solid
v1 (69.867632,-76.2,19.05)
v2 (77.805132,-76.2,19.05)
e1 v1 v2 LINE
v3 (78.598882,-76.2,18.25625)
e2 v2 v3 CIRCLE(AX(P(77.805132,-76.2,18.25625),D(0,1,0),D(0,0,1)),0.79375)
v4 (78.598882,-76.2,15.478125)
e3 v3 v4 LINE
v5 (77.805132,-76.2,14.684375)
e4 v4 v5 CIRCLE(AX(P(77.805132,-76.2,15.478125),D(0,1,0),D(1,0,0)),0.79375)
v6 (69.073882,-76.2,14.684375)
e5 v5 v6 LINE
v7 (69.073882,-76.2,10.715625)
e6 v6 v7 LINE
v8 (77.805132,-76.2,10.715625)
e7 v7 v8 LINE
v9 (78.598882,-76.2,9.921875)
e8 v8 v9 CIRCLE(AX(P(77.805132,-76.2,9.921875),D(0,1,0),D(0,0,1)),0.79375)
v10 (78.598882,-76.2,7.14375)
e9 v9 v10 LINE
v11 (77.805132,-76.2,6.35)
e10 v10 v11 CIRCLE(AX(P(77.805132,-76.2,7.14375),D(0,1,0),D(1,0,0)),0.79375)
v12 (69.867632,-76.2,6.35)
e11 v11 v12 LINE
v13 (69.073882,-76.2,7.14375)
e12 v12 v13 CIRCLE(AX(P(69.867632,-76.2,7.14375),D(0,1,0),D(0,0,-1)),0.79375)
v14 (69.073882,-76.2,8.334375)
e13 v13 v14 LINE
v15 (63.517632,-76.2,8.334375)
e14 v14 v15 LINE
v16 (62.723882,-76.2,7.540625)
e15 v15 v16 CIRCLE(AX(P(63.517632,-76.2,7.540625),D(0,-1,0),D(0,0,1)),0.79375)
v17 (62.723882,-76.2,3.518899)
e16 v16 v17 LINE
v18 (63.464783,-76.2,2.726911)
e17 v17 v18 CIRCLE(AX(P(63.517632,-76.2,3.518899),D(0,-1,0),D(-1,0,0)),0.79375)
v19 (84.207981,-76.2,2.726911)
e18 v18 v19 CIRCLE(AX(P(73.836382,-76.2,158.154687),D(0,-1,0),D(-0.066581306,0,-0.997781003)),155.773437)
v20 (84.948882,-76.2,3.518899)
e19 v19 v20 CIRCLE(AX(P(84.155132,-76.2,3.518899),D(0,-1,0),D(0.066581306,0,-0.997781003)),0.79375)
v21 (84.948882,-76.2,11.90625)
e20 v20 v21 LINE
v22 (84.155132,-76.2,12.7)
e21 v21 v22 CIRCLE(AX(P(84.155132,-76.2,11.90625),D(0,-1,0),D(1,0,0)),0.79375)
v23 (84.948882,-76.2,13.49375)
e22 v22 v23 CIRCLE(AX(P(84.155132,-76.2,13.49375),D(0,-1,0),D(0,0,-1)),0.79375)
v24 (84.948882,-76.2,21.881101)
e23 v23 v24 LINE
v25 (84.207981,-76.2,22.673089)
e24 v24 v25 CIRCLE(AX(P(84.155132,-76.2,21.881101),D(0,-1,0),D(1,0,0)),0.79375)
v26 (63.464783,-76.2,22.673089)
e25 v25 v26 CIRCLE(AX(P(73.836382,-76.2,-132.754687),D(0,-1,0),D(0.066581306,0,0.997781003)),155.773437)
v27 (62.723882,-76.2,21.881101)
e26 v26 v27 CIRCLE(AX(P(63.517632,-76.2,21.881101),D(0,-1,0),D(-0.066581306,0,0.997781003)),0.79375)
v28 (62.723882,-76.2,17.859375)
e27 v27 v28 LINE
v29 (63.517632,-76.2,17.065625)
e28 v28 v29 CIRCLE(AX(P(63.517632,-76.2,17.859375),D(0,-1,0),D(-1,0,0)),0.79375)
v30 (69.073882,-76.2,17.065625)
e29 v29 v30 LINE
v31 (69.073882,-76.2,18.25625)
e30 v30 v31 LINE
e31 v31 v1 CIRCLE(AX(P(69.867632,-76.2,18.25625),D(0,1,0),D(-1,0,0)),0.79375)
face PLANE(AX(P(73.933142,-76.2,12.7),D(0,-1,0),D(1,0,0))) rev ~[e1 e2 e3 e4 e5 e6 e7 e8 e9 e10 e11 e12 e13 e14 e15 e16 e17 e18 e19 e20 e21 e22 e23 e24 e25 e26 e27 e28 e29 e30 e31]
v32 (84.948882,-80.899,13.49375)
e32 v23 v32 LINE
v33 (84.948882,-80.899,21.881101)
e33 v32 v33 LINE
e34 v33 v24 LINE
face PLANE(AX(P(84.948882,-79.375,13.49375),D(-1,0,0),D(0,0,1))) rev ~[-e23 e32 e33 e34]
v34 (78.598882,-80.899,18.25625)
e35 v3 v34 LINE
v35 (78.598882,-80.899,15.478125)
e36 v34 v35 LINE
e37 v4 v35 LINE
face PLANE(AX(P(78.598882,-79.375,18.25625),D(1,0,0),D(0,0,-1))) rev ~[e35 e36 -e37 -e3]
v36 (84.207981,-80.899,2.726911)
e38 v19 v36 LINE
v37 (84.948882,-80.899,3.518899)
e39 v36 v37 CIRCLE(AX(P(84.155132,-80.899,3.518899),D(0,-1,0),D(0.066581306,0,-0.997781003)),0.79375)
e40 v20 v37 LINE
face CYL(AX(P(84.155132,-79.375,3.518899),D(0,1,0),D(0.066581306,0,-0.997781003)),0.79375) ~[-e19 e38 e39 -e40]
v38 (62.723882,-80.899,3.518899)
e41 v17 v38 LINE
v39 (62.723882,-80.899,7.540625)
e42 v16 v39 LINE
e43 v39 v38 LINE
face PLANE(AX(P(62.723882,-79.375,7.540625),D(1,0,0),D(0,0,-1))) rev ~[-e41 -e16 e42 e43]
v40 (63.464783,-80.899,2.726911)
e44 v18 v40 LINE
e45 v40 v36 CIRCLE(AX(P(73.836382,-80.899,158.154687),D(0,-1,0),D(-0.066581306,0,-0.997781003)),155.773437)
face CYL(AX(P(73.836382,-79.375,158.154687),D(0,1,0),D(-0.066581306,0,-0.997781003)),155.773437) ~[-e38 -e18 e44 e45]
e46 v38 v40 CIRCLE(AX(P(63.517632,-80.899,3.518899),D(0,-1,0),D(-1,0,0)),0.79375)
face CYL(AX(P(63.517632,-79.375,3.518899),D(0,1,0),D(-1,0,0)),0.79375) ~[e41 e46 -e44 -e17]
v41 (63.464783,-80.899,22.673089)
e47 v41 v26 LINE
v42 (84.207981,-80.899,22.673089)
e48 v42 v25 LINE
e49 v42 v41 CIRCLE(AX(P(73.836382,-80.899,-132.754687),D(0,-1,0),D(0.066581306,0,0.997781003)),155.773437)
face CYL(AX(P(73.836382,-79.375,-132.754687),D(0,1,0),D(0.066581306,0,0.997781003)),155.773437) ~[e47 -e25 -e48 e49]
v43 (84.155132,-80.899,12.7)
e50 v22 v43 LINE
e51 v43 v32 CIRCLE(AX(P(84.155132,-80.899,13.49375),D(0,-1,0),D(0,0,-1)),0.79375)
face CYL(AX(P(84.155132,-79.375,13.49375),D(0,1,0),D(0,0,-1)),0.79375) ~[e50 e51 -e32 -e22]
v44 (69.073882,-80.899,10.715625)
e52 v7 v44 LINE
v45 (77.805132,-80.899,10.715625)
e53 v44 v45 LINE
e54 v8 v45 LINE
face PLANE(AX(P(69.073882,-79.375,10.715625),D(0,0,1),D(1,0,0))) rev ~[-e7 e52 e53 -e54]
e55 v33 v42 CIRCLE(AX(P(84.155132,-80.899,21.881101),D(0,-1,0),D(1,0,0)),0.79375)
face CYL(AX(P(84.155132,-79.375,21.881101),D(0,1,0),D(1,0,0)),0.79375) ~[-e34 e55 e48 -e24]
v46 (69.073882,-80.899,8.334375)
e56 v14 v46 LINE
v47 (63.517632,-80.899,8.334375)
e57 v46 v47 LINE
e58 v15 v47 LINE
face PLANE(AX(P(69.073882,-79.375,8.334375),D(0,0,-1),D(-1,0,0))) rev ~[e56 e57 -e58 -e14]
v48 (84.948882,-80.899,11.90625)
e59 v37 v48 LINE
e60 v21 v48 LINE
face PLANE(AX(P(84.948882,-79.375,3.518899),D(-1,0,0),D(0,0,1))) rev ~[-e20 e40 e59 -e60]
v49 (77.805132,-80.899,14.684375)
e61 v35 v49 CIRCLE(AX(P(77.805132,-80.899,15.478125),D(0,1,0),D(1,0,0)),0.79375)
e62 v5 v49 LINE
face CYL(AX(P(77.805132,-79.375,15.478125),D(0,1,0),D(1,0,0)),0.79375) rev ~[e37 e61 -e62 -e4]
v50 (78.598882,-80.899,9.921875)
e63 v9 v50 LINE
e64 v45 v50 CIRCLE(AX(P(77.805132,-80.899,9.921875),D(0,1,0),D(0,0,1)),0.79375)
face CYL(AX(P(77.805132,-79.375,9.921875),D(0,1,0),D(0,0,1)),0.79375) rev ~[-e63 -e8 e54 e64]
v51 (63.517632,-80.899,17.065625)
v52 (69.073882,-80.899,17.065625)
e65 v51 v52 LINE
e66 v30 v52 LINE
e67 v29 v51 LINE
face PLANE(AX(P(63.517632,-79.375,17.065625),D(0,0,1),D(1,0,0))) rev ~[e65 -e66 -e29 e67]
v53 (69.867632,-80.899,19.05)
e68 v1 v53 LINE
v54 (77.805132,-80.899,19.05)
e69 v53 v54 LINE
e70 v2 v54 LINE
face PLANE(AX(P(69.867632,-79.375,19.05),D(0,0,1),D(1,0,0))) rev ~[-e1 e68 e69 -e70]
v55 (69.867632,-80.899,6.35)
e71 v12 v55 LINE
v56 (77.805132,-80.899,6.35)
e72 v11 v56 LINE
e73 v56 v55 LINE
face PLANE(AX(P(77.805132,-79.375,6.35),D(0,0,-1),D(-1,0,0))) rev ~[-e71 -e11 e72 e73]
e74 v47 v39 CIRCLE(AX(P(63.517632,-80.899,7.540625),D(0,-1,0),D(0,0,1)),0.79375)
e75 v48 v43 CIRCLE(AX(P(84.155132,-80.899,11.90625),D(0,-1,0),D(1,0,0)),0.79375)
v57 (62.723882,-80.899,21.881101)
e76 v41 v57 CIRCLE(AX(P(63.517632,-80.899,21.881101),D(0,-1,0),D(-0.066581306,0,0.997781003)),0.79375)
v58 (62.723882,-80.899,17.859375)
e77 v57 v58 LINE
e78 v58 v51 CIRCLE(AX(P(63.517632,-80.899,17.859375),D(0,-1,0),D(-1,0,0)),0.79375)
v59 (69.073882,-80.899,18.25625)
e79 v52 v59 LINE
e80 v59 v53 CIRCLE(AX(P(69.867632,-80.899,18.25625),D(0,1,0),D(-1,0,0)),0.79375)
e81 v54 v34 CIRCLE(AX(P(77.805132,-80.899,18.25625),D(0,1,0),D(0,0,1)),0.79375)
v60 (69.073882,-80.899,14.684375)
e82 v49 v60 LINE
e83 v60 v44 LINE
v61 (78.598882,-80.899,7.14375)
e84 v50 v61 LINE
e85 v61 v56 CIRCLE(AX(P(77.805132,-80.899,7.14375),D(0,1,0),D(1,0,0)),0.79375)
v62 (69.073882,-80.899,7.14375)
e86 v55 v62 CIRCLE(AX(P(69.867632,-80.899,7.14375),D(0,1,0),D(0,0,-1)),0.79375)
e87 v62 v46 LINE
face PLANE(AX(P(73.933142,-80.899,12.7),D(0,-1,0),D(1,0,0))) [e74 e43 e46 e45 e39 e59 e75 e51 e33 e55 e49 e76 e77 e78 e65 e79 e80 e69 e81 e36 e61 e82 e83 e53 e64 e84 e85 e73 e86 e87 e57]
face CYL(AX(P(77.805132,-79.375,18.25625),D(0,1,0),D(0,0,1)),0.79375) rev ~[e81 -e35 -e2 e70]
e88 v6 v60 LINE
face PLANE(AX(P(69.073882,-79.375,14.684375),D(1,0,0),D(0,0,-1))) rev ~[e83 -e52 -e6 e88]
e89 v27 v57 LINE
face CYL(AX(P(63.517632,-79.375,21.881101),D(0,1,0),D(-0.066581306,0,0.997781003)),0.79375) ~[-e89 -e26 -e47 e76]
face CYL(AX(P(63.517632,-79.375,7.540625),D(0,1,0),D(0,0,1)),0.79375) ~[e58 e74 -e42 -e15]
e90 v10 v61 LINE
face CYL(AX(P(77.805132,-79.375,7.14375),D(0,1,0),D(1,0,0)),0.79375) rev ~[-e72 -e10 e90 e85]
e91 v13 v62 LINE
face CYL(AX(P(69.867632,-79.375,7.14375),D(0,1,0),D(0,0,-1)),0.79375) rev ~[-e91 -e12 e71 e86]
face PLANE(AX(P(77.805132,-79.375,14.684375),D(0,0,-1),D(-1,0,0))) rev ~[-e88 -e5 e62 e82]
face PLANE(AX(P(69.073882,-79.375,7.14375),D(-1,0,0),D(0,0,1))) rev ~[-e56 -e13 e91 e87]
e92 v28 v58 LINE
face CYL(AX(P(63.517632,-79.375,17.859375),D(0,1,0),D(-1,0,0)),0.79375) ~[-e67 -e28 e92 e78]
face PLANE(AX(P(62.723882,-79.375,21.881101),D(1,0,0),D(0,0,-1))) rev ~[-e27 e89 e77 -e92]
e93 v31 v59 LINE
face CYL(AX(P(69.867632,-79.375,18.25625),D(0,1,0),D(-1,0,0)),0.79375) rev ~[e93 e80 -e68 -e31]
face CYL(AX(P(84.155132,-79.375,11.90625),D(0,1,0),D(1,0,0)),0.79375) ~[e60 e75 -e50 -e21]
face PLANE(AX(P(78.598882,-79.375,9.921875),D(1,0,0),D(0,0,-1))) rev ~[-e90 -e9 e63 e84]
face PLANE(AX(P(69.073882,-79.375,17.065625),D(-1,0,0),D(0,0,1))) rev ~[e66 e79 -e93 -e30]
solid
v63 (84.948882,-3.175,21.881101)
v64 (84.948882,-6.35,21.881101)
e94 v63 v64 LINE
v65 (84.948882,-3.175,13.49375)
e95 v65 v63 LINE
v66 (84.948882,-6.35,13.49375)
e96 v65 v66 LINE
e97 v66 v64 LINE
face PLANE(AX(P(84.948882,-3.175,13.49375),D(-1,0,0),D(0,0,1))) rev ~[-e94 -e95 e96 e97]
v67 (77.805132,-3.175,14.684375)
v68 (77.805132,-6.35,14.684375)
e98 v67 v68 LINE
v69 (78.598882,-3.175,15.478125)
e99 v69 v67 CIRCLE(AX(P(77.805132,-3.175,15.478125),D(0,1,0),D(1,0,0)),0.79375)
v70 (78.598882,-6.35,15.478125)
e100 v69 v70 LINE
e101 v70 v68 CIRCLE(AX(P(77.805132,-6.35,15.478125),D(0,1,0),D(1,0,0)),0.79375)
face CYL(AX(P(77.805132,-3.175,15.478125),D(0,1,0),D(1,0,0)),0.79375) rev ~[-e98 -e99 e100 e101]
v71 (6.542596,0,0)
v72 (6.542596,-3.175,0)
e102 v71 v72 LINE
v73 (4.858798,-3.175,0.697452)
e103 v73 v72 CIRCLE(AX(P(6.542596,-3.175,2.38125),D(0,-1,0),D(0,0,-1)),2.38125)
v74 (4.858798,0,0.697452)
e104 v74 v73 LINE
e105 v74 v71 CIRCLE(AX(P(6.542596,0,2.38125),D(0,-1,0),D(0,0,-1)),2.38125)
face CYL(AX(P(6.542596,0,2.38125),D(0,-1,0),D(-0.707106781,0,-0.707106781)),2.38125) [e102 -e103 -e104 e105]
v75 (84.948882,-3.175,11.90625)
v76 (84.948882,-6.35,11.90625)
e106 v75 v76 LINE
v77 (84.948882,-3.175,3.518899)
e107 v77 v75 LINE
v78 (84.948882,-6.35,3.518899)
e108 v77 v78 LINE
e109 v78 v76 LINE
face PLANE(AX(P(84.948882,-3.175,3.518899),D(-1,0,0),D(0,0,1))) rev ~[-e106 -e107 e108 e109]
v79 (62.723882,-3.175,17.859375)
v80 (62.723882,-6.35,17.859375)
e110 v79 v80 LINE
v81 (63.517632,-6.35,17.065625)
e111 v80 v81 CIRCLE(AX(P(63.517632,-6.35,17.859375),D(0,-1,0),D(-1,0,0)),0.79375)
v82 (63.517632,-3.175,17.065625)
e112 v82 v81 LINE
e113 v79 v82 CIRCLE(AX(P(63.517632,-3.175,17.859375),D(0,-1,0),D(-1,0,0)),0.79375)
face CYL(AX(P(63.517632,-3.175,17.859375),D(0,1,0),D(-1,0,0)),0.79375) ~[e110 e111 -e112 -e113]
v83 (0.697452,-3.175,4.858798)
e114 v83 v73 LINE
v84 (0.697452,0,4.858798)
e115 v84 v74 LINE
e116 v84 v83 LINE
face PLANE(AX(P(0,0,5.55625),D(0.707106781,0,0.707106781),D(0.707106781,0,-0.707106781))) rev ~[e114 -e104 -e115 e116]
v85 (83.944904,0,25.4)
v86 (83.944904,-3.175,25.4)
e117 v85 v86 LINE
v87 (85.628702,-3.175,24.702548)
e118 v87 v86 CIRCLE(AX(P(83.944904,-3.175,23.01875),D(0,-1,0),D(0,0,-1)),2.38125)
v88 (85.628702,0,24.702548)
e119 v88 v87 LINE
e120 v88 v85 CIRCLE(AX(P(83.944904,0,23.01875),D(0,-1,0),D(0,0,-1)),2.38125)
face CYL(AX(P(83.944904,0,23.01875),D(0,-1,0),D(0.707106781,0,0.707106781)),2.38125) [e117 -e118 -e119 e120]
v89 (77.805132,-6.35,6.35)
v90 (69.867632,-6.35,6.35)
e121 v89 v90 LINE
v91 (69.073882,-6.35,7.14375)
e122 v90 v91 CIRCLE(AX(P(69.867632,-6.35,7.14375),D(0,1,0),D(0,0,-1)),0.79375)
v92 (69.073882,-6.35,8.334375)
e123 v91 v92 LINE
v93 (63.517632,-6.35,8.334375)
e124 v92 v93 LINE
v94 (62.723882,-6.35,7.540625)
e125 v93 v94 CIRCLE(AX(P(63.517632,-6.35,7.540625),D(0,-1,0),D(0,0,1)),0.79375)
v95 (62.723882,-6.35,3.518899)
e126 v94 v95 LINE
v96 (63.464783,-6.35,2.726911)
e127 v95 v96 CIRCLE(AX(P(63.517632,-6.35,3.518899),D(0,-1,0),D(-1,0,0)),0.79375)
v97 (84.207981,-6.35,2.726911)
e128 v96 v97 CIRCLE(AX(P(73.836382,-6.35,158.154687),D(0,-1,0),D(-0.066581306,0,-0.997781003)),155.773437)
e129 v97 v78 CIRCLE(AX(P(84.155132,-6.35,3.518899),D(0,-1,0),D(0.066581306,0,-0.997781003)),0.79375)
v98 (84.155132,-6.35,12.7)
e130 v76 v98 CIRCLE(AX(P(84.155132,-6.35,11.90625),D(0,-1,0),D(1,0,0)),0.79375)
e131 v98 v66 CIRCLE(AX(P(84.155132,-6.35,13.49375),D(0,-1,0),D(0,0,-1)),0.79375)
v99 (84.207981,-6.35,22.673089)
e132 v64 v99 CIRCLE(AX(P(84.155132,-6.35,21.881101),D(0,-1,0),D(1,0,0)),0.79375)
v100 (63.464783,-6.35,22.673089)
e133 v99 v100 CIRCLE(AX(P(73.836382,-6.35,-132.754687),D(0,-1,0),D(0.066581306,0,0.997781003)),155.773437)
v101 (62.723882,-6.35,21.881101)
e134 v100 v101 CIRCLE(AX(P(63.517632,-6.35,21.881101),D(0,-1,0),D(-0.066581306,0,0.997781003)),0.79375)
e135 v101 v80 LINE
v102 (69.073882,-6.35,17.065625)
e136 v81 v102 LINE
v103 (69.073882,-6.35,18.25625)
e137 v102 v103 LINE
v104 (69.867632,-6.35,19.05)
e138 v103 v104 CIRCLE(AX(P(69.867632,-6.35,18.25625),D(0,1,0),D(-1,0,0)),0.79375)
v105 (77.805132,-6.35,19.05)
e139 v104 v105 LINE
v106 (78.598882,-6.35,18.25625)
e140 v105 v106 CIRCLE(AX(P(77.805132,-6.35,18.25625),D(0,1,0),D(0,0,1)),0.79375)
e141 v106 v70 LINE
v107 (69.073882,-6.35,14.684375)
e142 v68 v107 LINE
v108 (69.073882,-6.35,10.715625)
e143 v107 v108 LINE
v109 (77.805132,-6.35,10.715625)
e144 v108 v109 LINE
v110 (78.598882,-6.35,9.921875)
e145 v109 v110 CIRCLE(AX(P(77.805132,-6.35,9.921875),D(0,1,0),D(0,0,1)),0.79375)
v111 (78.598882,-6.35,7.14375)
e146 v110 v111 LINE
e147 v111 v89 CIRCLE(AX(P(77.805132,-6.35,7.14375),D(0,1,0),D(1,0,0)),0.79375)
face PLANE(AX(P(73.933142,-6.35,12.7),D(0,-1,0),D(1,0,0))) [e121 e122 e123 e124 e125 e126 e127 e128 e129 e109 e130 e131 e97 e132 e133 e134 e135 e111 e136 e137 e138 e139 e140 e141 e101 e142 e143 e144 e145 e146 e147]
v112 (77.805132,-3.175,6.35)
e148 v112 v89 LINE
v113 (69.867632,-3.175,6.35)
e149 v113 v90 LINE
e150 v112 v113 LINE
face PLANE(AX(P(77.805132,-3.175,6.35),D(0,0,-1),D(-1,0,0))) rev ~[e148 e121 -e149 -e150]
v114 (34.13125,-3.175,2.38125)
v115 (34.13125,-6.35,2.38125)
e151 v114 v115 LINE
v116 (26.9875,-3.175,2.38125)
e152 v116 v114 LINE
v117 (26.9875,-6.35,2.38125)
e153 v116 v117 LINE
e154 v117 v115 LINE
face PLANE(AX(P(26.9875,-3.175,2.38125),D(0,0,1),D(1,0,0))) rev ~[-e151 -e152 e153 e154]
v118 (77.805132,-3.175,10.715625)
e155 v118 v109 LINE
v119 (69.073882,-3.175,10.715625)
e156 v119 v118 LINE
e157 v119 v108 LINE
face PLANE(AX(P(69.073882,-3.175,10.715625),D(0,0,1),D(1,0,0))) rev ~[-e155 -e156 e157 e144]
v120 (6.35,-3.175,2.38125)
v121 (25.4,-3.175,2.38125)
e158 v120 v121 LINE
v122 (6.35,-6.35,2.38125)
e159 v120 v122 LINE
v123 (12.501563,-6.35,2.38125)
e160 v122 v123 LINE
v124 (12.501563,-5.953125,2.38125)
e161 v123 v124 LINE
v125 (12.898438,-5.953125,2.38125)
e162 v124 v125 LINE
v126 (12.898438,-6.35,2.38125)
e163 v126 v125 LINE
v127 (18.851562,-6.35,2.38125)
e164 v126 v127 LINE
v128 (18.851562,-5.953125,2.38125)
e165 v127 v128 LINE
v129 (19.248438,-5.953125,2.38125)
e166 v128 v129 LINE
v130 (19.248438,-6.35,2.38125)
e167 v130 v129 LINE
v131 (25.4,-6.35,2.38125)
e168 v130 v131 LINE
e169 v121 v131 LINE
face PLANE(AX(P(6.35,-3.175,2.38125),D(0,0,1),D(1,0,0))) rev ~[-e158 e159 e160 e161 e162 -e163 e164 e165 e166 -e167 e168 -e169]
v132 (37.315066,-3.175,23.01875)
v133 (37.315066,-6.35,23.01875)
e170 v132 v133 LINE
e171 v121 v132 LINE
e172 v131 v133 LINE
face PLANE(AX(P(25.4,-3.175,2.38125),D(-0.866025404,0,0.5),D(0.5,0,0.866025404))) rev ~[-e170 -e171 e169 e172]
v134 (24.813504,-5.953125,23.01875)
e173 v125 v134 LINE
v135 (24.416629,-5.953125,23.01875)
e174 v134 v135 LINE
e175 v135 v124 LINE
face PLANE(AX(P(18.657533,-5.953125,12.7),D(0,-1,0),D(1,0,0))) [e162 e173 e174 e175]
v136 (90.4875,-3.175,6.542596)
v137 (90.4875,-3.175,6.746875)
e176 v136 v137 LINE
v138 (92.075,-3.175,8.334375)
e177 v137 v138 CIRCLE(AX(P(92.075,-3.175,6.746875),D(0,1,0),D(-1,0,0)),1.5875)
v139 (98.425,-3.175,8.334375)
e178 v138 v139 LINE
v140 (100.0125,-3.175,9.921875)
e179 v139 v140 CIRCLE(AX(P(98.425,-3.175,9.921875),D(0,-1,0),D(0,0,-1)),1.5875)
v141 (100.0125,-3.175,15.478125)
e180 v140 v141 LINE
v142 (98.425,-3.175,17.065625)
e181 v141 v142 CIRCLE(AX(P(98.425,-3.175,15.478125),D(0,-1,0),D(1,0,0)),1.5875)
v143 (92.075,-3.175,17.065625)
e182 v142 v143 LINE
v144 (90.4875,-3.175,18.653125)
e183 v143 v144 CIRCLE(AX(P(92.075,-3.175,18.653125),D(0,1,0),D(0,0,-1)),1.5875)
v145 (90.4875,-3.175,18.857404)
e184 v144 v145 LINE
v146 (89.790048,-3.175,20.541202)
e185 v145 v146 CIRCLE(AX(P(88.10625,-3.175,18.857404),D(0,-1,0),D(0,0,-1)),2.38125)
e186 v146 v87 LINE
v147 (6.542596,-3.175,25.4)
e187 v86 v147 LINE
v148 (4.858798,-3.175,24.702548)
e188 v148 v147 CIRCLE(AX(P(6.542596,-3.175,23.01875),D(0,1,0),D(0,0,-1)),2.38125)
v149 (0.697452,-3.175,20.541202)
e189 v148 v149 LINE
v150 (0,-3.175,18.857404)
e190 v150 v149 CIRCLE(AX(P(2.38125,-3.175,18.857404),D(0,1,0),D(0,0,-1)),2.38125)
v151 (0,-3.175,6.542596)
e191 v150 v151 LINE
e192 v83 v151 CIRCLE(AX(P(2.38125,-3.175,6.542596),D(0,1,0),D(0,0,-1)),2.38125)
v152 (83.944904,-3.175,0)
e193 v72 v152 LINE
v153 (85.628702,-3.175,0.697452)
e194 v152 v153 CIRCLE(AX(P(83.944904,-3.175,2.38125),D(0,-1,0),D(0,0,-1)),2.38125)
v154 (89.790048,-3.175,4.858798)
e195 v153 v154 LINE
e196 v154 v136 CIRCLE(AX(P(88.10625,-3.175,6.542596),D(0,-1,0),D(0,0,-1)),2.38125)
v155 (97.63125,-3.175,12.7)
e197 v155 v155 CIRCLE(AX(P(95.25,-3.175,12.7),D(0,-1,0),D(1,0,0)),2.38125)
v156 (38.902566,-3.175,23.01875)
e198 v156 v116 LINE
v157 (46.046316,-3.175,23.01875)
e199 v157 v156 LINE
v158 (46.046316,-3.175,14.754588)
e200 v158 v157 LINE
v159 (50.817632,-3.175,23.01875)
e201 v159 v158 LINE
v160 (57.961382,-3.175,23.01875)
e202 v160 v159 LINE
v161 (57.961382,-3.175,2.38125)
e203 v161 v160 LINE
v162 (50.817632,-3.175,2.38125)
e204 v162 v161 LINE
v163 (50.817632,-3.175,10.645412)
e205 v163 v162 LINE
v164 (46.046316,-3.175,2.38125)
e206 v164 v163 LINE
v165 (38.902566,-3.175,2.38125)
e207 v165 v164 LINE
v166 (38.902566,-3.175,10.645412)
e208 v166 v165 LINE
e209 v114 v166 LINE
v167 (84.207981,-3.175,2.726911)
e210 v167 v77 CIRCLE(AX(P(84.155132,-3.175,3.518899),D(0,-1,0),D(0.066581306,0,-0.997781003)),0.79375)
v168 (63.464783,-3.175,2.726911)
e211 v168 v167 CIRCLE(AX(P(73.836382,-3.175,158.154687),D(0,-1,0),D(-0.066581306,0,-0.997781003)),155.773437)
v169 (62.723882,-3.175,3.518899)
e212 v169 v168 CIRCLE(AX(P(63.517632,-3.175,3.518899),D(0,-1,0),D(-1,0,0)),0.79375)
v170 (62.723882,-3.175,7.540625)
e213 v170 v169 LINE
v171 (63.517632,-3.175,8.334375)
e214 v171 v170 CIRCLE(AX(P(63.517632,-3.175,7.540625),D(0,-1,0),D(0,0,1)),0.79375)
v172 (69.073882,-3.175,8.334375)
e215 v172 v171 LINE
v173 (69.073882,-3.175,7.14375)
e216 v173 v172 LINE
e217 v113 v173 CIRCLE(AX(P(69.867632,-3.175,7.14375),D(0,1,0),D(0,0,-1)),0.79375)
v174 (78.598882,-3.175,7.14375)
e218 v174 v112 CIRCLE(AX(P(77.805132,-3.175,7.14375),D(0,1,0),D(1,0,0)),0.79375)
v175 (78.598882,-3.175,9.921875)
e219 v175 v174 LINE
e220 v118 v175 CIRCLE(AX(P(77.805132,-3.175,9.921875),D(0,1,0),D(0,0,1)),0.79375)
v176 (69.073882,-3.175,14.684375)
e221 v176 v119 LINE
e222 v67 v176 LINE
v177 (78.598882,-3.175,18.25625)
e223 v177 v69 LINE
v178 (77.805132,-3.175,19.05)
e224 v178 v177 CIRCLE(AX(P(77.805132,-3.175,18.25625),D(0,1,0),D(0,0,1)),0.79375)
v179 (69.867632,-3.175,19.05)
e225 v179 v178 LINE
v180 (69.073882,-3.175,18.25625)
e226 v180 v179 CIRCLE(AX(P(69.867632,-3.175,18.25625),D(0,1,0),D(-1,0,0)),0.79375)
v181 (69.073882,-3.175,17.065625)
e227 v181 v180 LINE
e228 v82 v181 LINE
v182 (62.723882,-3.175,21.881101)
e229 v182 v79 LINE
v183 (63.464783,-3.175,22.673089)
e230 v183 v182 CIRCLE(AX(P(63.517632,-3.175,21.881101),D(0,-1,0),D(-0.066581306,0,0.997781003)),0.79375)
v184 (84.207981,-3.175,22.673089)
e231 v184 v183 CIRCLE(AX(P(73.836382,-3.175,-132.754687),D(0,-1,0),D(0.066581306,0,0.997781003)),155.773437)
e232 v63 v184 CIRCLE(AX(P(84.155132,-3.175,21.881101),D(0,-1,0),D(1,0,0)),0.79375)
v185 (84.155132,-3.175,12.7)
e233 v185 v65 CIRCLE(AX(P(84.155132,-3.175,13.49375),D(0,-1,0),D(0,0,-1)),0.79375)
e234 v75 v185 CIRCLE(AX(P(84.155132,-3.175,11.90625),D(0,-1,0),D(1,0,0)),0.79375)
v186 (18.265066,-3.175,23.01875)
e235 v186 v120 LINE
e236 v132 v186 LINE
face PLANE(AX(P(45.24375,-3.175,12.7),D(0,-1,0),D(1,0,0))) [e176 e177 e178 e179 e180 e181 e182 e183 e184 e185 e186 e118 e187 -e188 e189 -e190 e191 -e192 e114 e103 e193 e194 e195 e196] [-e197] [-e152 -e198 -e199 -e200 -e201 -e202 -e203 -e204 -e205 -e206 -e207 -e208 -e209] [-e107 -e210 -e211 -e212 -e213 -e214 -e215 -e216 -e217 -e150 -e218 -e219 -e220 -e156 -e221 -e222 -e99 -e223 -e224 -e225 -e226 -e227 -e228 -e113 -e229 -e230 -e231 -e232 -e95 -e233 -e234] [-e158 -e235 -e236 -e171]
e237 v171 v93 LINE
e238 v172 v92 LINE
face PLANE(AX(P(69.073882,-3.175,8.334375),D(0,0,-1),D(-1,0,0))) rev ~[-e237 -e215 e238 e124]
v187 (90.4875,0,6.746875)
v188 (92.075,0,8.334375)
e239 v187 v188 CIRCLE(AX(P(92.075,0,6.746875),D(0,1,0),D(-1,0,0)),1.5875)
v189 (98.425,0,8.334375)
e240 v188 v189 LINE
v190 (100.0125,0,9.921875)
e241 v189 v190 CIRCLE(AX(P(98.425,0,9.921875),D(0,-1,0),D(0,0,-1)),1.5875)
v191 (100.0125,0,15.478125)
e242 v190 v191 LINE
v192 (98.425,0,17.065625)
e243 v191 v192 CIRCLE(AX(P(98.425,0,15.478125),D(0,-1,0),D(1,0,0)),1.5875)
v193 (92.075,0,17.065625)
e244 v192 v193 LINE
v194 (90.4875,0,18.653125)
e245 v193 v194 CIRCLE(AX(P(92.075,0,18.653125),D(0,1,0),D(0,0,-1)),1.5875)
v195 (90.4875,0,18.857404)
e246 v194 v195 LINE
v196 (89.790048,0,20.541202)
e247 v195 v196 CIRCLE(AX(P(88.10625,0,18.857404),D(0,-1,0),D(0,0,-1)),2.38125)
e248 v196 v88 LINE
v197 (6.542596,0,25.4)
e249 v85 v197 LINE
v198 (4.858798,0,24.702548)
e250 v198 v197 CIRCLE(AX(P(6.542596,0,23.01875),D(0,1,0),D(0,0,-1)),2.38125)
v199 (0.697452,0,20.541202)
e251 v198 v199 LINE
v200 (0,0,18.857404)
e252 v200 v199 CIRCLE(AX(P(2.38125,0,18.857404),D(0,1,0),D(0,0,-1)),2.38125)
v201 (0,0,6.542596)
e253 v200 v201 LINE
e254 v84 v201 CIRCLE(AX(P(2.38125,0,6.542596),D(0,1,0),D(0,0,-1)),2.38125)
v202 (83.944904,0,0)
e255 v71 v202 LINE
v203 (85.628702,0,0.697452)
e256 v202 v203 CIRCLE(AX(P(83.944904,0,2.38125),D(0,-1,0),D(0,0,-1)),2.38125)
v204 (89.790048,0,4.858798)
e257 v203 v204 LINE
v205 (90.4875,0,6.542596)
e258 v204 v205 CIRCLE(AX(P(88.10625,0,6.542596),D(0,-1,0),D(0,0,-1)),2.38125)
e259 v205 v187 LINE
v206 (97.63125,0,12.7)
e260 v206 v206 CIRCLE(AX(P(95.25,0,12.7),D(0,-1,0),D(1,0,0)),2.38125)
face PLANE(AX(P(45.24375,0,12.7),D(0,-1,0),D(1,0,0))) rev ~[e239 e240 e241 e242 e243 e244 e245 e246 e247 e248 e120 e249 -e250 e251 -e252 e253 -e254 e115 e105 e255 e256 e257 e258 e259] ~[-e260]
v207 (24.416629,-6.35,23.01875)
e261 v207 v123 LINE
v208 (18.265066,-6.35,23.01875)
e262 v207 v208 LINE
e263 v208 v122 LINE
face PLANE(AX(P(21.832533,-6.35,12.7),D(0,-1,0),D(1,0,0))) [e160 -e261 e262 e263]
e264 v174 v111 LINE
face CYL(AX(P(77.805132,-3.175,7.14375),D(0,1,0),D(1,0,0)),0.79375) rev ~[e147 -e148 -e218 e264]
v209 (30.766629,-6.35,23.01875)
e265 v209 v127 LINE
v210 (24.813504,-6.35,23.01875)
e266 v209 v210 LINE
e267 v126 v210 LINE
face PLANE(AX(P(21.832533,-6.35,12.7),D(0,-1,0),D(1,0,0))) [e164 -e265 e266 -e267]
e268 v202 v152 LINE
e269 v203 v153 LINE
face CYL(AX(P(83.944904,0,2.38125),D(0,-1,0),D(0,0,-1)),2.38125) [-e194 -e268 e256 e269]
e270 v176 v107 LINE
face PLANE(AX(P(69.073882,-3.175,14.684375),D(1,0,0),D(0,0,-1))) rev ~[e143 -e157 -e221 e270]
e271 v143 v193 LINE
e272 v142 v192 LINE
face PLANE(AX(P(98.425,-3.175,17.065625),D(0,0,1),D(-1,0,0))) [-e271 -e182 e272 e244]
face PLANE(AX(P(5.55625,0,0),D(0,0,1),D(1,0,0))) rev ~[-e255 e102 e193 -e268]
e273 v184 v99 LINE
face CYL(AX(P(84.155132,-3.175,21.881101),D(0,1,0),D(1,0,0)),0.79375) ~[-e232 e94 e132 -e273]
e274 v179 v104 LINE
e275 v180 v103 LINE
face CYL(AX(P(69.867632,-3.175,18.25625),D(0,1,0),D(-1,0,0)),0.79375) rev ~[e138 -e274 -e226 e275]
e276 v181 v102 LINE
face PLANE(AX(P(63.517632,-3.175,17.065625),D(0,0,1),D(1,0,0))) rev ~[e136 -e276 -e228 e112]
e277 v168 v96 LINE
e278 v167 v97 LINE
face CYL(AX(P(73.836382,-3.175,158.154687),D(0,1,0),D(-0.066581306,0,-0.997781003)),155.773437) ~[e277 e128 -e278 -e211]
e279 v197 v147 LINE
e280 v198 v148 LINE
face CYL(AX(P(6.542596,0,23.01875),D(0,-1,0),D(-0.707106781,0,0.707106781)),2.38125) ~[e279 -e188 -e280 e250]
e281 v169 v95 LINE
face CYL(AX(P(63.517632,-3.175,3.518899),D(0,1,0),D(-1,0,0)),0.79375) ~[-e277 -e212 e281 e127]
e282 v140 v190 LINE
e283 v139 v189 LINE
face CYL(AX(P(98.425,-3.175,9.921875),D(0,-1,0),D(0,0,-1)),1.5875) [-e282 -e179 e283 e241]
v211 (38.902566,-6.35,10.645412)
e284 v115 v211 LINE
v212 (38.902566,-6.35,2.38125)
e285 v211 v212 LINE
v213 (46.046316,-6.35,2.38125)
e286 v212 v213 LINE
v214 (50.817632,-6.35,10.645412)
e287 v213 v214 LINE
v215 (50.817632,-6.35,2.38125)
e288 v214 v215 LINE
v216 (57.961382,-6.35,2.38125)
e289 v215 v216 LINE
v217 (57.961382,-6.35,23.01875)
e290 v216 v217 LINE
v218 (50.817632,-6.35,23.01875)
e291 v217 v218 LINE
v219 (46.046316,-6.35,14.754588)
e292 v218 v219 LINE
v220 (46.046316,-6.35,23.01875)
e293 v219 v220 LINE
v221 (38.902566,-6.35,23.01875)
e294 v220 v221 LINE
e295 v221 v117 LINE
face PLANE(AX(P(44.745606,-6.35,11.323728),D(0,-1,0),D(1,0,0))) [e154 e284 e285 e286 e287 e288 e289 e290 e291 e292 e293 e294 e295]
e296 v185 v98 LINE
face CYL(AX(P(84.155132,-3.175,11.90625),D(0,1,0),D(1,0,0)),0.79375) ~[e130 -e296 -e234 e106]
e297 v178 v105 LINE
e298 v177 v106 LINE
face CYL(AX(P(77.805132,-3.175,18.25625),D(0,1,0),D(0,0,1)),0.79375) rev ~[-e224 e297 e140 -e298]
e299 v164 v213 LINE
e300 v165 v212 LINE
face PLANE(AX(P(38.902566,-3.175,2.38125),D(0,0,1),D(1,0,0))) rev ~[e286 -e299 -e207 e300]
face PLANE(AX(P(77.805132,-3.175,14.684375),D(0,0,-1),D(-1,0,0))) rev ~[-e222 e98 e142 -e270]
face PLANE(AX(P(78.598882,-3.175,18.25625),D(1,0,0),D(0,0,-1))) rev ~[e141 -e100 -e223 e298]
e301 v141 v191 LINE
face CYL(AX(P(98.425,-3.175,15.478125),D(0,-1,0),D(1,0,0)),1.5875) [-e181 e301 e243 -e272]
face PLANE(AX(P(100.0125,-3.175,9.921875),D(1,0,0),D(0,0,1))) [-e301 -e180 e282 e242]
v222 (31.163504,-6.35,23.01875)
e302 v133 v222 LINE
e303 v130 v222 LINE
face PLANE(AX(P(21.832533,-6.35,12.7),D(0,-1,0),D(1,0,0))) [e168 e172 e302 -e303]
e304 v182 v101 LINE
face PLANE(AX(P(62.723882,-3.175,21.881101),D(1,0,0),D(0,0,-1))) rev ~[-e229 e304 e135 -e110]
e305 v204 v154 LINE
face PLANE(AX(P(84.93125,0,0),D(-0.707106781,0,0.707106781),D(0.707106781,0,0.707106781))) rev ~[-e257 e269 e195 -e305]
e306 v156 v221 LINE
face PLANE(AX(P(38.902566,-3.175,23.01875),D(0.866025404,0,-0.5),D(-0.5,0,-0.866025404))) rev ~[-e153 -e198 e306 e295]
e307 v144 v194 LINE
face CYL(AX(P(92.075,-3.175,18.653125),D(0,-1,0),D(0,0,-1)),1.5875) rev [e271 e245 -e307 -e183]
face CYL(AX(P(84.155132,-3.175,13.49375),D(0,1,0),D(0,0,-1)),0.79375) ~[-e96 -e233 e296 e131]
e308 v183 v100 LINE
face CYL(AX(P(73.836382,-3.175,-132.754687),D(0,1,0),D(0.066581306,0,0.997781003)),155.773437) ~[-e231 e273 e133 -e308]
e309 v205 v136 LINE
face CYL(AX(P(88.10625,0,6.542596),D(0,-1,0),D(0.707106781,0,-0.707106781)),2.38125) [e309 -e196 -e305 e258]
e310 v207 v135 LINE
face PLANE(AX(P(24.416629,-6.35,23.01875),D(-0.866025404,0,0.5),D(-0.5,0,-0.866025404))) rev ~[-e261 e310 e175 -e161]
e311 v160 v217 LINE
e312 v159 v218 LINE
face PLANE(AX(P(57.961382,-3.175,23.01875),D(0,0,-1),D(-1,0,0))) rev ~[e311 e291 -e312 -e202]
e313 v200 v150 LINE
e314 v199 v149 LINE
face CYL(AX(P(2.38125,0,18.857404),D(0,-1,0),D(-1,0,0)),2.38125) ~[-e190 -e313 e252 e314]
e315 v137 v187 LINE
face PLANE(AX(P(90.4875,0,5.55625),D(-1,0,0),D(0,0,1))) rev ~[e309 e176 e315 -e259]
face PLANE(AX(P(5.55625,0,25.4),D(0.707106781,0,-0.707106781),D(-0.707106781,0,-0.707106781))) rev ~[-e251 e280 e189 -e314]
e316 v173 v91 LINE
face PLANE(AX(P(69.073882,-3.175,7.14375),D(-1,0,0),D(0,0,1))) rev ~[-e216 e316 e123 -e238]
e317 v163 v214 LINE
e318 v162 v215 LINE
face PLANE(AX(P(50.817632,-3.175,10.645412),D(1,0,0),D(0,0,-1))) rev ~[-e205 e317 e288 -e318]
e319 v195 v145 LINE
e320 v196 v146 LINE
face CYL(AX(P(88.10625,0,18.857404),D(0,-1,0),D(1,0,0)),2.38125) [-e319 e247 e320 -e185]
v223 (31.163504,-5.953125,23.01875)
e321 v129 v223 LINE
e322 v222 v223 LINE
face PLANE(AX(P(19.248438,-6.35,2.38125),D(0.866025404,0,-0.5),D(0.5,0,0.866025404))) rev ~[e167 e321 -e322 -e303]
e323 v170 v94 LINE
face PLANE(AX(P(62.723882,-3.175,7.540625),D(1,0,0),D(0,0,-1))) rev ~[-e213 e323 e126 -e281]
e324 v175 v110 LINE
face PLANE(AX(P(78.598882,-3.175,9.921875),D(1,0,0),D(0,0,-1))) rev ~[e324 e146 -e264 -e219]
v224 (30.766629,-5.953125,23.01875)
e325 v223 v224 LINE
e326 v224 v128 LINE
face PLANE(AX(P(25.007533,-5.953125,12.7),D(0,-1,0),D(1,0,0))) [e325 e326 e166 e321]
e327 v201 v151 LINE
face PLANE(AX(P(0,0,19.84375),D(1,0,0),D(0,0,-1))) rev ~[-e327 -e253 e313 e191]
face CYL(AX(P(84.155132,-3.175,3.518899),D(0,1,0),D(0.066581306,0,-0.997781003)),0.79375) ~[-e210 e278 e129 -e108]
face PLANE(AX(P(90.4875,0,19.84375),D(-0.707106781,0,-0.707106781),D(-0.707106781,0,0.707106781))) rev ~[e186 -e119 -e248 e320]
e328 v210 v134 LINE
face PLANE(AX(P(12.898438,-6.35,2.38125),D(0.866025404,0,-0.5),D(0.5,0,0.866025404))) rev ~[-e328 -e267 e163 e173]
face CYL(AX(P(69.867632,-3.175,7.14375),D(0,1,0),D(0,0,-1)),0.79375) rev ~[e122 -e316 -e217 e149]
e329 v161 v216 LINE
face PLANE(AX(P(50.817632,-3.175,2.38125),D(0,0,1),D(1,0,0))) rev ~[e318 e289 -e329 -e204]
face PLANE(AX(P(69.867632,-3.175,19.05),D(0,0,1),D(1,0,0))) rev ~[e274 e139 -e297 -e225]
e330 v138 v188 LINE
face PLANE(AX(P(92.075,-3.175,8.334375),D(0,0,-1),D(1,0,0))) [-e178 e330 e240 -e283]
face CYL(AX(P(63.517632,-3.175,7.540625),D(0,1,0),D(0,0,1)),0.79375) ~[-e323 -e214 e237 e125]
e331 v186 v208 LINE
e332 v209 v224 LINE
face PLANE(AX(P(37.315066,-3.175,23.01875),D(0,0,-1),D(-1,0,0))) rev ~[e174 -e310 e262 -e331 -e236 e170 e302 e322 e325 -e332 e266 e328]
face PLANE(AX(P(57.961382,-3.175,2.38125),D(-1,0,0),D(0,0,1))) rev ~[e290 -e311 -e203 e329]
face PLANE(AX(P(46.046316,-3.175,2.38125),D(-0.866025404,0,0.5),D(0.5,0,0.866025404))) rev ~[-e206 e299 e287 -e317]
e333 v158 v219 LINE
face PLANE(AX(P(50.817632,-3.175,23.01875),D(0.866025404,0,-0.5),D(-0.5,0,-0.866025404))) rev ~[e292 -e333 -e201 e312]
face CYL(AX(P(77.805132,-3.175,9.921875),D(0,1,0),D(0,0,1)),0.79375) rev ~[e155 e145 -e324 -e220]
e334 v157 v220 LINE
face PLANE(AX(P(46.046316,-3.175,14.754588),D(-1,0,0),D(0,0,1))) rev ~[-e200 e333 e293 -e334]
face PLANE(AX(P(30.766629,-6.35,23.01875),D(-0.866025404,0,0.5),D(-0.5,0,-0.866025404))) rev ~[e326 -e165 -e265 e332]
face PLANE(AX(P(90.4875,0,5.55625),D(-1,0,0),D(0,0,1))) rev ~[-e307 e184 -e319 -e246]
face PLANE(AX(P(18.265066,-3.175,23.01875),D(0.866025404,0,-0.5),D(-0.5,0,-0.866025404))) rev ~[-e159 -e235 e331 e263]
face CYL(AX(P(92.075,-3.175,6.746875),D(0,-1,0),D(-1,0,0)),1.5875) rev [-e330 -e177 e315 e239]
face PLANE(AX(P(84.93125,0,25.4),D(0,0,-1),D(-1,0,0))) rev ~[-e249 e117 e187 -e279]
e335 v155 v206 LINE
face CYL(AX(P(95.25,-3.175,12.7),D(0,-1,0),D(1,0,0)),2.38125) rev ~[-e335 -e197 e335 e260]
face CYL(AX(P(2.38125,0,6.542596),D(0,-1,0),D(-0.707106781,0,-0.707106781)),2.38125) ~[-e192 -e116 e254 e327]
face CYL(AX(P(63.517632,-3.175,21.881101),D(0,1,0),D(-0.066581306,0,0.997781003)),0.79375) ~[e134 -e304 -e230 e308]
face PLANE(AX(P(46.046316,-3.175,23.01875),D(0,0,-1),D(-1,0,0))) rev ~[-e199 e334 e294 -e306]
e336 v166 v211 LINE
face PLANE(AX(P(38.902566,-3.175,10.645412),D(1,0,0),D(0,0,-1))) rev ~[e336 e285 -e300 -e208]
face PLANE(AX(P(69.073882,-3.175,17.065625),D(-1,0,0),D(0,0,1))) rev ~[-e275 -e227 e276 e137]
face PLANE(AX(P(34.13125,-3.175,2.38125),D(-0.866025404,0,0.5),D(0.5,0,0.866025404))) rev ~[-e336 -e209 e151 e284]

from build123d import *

# Parameters (mm, degrees)
F1_DEPTH  = 3.175
F3_DEPTH  = 3.175
F5_DEPTH  = 0.396875
F6_R      = 2.38125
F7_R      = 2.38125
F8_DEPTH  = 3.175
F11_DEPTH = 3.175
F12_DEPTH = 1.524


# Not quite as in the source:
# - a feature names something its author has since deleted; it is built from what else it names


with BuildPart() as f1:
    # F0 (on Front) → F1 (new body)
    with BuildSketch(Plane.XZ):
        Polygon((0, 5.55625), (5.55625, 0), (84.93125, 0), (90.4875, 5.55625), (90.4875, 19.84375), (84.93125, 25.4), (5.55625, 25.4), (0, 19.84375), align=None)
    extrude(amount=F1_DEPTH)

    # F2 (on face) → F3 (join)
    with BuildSketch(Plane.XZ.offset(3.175)):
        Polygon((18.2650661804, 23.01875), (6.35, 2.38125), (25.4, 2.38125), (37.3150661804, 23.01875), align=None)
        Polygon((38.9025661804, 23.01875), (26.9875, 2.38125), (34.13125, 2.38125), (38.9025661804, 10.6454120434), (38.9025661804, 2.38125), (46.0463161804, 2.38125), (50.8176323608, 10.6454120434), (50.8176323608, 2.38125), (57.9613823608, 2.38125), (57.9613823608, 23.01875), (50.8176323608, 23.01875), (46.0463161804, 14.7545879566), (46.0463161804, 23.01875), align=None)
        with BuildLine():
            ThreePointArc((63.4647834492, 22.6730891893), (62.9379825156, 22.4233597915), (62.7238823608, 21.8811005183))
            Line((62.7238823608, 21.8811005183), (62.7238823608, 17.859375))
            ThreePointArc((62.7238823608, 17.859375), (62.9563663532, 17.2981089924), (63.5176323608, 17.065625))
            Line((63.5176323608, 17.065625), (69.0738823608, 17.065625))
            Line((69.0738823608, 17.065625), (69.0738823608, 18.25625))
            ThreePointArc((69.0738823608, 18.25625), (69.3063663532, 18.8175160076), (69.8676323608, 19.05))
            Line((69.8676323608, 19.05), (77.8051323608, 19.05))
            ThreePointArc((77.8051323608, 19.05), (78.3663983684, 18.8175160076), (78.5988823608, 18.25625))
            Line((78.5988823608, 18.25625), (78.5988823608, 15.478125))
            ThreePointArc((78.5988823608, 15.478125), (78.3663983684, 14.9168589924), (77.8051323608, 14.684375))
            Line((77.8051323608, 14.684375), (69.0738823608, 14.684375))
            Line((69.0738823608, 14.684375), (69.0738823608, 10.715625))
            Line((69.0738823608, 10.715625), (77.8051323608, 10.715625))
            ThreePointArc((77.8051323608, 10.715625), (78.3663983684, 10.4831410076), (78.5988823608, 9.921875))
            Line((78.5988823608, 9.921875), (78.5988823608, 7.14375))
            ThreePointArc((78.5988823608, 7.14375), (78.3663983684, 6.5824839924), (77.8051323608, 6.35))
            Line((77.8051323608, 6.35), (69.8676323608, 6.35))
            ThreePointArc((69.8676323608, 6.35), (69.3063663532, 6.5824839924), (69.0738823608, 7.14375))
            Line((69.0738823608, 7.14375), (69.0738823608, 8.334375))
            Line((69.0738823608, 8.334375), (63.5176323608, 8.334375))
            ThreePointArc((63.5176323608, 8.334375), (62.9563663532, 8.1018910076), (62.7238823608, 7.540625))
            Line((62.7238823608, 7.540625), (62.7238823608, 3.5188994817))
            ThreePointArc((62.7238823608, 3.5188994817), (62.9379825156, 2.9766402085), (63.4647834492, 2.7269108107))
            ThreePointArc((63.4647834492, 2.7269108107), (73.8363823608, 2.38125), (84.2079812725, 2.7269108107))
            ThreePointArc((84.2079812725, 2.7269108107), (84.734782206, 2.9766402085), (84.9488823608, 3.5188994817))
            Line((84.9488823608, 3.5188994817), (84.9488823608, 11.90625))
            ThreePointArc((84.9488823608, 11.90625), (84.7163983684, 12.4675160076), (84.1551323608, 12.7))
            ThreePointArc((84.1551323608, 12.7), (84.7163983684, 12.9324839924), (84.9488823608, 13.49375))
            Line((84.9488823608, 13.49375), (84.9488823608, 16.8671875))
            Line((84.9488823608, 16.8671875), (84.9488823608, 21.8811005183))
            ThreePointArc((84.9488823608, 21.8811005183), (84.734782206, 22.4233597915), (84.2079812725, 22.6730891893))
            ThreePointArc((84.2079812725, 22.6730891893), (73.8363823608, 23.01875), (63.4647834492, 22.6730891893))
        make_face()
    extrude(amount=F3_DEPTH)

    # F4 (on face) → F5 (cut)
    with BuildSketch(Plane.XZ.offset(6.35)):
        Polygon((19.2484375, 2.38125), (31.1635036804, 23.01875), (30.7666286804, 23.01875), (18.8515625, 2.38125), align=None)
        Polygon((12.8984375, 2.38125), (24.8135036804, 23.01875), (24.4166286804, 23.01875), (12.5015625, 2.38125), align=None)
    extrude(amount=-F5_DEPTH, mode=Mode.SUBTRACT)

    # F6
    f6_edges = [f1.edges().sort_by_distance(p)[0] for p in [
        (90.4875, -1.5875, 19.84375),
        (84.93125, -1.5875, 25.4),
        (5.55625, -1.5875, 25.4),
        (5.55625, -1.5875, 0),
        (0, -1.5875, 5.55625),
        (0, -1.5875, 19.84375),
        (84.93125, -1.5875, 0),
        (90.4875, -1.5875, 5.55625),
    ]]
    fillet(f6_edges, radius=F6_R)

    # F7 (on face) → F8 (join, through all)
    with BuildSketch(Plane.XZ.offset(3.175)):
        with BuildLine():
            ThreePointArc((98.425, 8.334375), (99.5475320151, 8.7993429849), (100.0125, 9.921875))
            Line((100.0125, 9.921875), (100.0125, 15.478125))
            ThreePointArc((100.0125, 15.478125), (99.5475320151, 16.6006570151), (98.425, 17.065625))
            Line((98.425, 17.065625), (92.075, 17.065625))
            ThreePointArc((92.075, 17.065625), (90.9524679849, 17.5305929849), (90.4875, 18.653125))
            Line((90.4875, 18.653125), (90.4875, 6.746875))
            ThreePointArc((90.4875, 6.746875), (90.9524679849, 7.8694070151), (92.075, 8.334375))
            Line((92.075, 8.334375), (98.425, 8.334375))
        make_face()
        with Locations((95.25, 12.7)):
            Circle(F7_R, mode=Mode.SUBTRACT)
    extrude(amount=-F8_DEPTH)


with BuildPart() as f11:
    # F10 (on offset) → F11 (new body)
    with BuildSketch(Plane.XZ.offset(76.2)):
        with BuildLine():
            ThreePointArc((63.4647834492, 22.6730891893), (62.9379825156, 22.4233597915), (62.7238823608, 21.8811005183))
            Line((62.7238823608, 21.8811005183), (62.7238823608, 17.859375))
            ThreePointArc((62.7238823608, 17.859375), (62.9563663532, 17.2981089924), (63.5176323608, 17.065625))
            Line((63.5176323608, 17.065625), (69.0738823608, 17.065625))
            Line((69.0738823608, 17.065625), (69.0738823608, 18.25625))
            ThreePointArc((69.0738823608, 18.25625), (69.3063663532, 18.8175160076), (69.8676323608, 19.05))
            Line((69.8676323608, 19.05), (77.8051323608, 19.05))
            ThreePointArc((77.8051323608, 19.05), (78.3663983684, 18.8175160076), (78.5988823608, 18.25625))
            Line((78.5988823608, 18.25625), (78.5988823608, 15.478125))
            ThreePointArc((78.5988823608, 15.478125), (78.3663983684, 14.9168589924), (77.8051323608, 14.684375))
            Line((77.8051323608, 14.684375), (69.0738823608, 14.684375))
            Line((69.0738823608, 14.684375), (69.0738823608, 12.7))
            Line((69.0738823608, 12.7), (69.0738823608, 10.715625))
            Line((69.0738823608, 10.715625), (77.8051323608, 10.715625))
            ThreePointArc((77.8051323608, 10.715625), (78.3663983684, 10.4831410076), (78.5988823608, 9.921875))
            Line((78.5988823608, 9.921875), (78.5988823608, 7.14375))
            ThreePointArc((78.5988823608, 7.14375), (78.3663983684, 6.5824839924), (77.8051323608, 6.35))
            Line((77.8051323608, 6.35), (69.8676323608, 6.35))
            ThreePointArc((69.8676323608, 6.35), (69.3063663532, 6.5824839924), (69.0738823608, 7.14375))
            Line((69.0738823608, 7.14375), (69.0738823608, 8.334375))
            Line((69.0738823608, 8.334375), (63.5176323608, 8.334375))
            ThreePointArc((63.5176323608, 8.334375), (62.9563663532, 8.1018910076), (62.7238823608, 7.540625))
            Line((62.7238823608, 7.540625), (62.7238823608, 3.5188994817))
            ThreePointArc((62.7238823608, 3.5188994817), (62.9379825156, 2.9766402085), (63.4647834492, 2.7269108107))
            ThreePointArc((63.4647834492, 2.7269108107), (73.8363823608, 2.38125), (84.2079812725, 2.7269108107))
            ThreePointArc((84.2079812725, 2.7269108107), (84.734782206, 2.9766402085), (84.9488823608, 3.5188994817))
            Line((84.9488823608, 3.5188994817), (84.9488823608, 11.90625))
            ThreePointArc((84.9488823608, 11.90625), (84.7163983684, 12.4675160076), (84.1551323608, 12.7))
            ThreePointArc((84.1551323608, 12.7), (84.7163983684, 12.9324839924), (84.9488823608, 13.49375))
            Line((84.9488823608, 13.49375), (84.9488823608, 16.8671875))
            Line((84.9488823608, 16.8671875), (84.9488823608, 21.8811005183))
            ThreePointArc((84.9488823608, 21.8811005183), (84.734782206, 22.4233597915), (84.2079812725, 22.6730891893))
            ThreePointArc((84.2079812725, 22.6730891893), (73.8363823608, 23.01875), (63.4647834492, 22.6730891893))
        make_face()
    extrude(amount=F11_DEPTH)

    # F12 (add): a face of the model
    f12_faces = [f11.faces().sort_by_distance(p)[0] for p in [
        (75.2419009789, -79.375, 12.7),
    ]]
    extrude(f12_faces, amount=F12_DEPTH)


solid = Compound([f1.part, f11.part])
